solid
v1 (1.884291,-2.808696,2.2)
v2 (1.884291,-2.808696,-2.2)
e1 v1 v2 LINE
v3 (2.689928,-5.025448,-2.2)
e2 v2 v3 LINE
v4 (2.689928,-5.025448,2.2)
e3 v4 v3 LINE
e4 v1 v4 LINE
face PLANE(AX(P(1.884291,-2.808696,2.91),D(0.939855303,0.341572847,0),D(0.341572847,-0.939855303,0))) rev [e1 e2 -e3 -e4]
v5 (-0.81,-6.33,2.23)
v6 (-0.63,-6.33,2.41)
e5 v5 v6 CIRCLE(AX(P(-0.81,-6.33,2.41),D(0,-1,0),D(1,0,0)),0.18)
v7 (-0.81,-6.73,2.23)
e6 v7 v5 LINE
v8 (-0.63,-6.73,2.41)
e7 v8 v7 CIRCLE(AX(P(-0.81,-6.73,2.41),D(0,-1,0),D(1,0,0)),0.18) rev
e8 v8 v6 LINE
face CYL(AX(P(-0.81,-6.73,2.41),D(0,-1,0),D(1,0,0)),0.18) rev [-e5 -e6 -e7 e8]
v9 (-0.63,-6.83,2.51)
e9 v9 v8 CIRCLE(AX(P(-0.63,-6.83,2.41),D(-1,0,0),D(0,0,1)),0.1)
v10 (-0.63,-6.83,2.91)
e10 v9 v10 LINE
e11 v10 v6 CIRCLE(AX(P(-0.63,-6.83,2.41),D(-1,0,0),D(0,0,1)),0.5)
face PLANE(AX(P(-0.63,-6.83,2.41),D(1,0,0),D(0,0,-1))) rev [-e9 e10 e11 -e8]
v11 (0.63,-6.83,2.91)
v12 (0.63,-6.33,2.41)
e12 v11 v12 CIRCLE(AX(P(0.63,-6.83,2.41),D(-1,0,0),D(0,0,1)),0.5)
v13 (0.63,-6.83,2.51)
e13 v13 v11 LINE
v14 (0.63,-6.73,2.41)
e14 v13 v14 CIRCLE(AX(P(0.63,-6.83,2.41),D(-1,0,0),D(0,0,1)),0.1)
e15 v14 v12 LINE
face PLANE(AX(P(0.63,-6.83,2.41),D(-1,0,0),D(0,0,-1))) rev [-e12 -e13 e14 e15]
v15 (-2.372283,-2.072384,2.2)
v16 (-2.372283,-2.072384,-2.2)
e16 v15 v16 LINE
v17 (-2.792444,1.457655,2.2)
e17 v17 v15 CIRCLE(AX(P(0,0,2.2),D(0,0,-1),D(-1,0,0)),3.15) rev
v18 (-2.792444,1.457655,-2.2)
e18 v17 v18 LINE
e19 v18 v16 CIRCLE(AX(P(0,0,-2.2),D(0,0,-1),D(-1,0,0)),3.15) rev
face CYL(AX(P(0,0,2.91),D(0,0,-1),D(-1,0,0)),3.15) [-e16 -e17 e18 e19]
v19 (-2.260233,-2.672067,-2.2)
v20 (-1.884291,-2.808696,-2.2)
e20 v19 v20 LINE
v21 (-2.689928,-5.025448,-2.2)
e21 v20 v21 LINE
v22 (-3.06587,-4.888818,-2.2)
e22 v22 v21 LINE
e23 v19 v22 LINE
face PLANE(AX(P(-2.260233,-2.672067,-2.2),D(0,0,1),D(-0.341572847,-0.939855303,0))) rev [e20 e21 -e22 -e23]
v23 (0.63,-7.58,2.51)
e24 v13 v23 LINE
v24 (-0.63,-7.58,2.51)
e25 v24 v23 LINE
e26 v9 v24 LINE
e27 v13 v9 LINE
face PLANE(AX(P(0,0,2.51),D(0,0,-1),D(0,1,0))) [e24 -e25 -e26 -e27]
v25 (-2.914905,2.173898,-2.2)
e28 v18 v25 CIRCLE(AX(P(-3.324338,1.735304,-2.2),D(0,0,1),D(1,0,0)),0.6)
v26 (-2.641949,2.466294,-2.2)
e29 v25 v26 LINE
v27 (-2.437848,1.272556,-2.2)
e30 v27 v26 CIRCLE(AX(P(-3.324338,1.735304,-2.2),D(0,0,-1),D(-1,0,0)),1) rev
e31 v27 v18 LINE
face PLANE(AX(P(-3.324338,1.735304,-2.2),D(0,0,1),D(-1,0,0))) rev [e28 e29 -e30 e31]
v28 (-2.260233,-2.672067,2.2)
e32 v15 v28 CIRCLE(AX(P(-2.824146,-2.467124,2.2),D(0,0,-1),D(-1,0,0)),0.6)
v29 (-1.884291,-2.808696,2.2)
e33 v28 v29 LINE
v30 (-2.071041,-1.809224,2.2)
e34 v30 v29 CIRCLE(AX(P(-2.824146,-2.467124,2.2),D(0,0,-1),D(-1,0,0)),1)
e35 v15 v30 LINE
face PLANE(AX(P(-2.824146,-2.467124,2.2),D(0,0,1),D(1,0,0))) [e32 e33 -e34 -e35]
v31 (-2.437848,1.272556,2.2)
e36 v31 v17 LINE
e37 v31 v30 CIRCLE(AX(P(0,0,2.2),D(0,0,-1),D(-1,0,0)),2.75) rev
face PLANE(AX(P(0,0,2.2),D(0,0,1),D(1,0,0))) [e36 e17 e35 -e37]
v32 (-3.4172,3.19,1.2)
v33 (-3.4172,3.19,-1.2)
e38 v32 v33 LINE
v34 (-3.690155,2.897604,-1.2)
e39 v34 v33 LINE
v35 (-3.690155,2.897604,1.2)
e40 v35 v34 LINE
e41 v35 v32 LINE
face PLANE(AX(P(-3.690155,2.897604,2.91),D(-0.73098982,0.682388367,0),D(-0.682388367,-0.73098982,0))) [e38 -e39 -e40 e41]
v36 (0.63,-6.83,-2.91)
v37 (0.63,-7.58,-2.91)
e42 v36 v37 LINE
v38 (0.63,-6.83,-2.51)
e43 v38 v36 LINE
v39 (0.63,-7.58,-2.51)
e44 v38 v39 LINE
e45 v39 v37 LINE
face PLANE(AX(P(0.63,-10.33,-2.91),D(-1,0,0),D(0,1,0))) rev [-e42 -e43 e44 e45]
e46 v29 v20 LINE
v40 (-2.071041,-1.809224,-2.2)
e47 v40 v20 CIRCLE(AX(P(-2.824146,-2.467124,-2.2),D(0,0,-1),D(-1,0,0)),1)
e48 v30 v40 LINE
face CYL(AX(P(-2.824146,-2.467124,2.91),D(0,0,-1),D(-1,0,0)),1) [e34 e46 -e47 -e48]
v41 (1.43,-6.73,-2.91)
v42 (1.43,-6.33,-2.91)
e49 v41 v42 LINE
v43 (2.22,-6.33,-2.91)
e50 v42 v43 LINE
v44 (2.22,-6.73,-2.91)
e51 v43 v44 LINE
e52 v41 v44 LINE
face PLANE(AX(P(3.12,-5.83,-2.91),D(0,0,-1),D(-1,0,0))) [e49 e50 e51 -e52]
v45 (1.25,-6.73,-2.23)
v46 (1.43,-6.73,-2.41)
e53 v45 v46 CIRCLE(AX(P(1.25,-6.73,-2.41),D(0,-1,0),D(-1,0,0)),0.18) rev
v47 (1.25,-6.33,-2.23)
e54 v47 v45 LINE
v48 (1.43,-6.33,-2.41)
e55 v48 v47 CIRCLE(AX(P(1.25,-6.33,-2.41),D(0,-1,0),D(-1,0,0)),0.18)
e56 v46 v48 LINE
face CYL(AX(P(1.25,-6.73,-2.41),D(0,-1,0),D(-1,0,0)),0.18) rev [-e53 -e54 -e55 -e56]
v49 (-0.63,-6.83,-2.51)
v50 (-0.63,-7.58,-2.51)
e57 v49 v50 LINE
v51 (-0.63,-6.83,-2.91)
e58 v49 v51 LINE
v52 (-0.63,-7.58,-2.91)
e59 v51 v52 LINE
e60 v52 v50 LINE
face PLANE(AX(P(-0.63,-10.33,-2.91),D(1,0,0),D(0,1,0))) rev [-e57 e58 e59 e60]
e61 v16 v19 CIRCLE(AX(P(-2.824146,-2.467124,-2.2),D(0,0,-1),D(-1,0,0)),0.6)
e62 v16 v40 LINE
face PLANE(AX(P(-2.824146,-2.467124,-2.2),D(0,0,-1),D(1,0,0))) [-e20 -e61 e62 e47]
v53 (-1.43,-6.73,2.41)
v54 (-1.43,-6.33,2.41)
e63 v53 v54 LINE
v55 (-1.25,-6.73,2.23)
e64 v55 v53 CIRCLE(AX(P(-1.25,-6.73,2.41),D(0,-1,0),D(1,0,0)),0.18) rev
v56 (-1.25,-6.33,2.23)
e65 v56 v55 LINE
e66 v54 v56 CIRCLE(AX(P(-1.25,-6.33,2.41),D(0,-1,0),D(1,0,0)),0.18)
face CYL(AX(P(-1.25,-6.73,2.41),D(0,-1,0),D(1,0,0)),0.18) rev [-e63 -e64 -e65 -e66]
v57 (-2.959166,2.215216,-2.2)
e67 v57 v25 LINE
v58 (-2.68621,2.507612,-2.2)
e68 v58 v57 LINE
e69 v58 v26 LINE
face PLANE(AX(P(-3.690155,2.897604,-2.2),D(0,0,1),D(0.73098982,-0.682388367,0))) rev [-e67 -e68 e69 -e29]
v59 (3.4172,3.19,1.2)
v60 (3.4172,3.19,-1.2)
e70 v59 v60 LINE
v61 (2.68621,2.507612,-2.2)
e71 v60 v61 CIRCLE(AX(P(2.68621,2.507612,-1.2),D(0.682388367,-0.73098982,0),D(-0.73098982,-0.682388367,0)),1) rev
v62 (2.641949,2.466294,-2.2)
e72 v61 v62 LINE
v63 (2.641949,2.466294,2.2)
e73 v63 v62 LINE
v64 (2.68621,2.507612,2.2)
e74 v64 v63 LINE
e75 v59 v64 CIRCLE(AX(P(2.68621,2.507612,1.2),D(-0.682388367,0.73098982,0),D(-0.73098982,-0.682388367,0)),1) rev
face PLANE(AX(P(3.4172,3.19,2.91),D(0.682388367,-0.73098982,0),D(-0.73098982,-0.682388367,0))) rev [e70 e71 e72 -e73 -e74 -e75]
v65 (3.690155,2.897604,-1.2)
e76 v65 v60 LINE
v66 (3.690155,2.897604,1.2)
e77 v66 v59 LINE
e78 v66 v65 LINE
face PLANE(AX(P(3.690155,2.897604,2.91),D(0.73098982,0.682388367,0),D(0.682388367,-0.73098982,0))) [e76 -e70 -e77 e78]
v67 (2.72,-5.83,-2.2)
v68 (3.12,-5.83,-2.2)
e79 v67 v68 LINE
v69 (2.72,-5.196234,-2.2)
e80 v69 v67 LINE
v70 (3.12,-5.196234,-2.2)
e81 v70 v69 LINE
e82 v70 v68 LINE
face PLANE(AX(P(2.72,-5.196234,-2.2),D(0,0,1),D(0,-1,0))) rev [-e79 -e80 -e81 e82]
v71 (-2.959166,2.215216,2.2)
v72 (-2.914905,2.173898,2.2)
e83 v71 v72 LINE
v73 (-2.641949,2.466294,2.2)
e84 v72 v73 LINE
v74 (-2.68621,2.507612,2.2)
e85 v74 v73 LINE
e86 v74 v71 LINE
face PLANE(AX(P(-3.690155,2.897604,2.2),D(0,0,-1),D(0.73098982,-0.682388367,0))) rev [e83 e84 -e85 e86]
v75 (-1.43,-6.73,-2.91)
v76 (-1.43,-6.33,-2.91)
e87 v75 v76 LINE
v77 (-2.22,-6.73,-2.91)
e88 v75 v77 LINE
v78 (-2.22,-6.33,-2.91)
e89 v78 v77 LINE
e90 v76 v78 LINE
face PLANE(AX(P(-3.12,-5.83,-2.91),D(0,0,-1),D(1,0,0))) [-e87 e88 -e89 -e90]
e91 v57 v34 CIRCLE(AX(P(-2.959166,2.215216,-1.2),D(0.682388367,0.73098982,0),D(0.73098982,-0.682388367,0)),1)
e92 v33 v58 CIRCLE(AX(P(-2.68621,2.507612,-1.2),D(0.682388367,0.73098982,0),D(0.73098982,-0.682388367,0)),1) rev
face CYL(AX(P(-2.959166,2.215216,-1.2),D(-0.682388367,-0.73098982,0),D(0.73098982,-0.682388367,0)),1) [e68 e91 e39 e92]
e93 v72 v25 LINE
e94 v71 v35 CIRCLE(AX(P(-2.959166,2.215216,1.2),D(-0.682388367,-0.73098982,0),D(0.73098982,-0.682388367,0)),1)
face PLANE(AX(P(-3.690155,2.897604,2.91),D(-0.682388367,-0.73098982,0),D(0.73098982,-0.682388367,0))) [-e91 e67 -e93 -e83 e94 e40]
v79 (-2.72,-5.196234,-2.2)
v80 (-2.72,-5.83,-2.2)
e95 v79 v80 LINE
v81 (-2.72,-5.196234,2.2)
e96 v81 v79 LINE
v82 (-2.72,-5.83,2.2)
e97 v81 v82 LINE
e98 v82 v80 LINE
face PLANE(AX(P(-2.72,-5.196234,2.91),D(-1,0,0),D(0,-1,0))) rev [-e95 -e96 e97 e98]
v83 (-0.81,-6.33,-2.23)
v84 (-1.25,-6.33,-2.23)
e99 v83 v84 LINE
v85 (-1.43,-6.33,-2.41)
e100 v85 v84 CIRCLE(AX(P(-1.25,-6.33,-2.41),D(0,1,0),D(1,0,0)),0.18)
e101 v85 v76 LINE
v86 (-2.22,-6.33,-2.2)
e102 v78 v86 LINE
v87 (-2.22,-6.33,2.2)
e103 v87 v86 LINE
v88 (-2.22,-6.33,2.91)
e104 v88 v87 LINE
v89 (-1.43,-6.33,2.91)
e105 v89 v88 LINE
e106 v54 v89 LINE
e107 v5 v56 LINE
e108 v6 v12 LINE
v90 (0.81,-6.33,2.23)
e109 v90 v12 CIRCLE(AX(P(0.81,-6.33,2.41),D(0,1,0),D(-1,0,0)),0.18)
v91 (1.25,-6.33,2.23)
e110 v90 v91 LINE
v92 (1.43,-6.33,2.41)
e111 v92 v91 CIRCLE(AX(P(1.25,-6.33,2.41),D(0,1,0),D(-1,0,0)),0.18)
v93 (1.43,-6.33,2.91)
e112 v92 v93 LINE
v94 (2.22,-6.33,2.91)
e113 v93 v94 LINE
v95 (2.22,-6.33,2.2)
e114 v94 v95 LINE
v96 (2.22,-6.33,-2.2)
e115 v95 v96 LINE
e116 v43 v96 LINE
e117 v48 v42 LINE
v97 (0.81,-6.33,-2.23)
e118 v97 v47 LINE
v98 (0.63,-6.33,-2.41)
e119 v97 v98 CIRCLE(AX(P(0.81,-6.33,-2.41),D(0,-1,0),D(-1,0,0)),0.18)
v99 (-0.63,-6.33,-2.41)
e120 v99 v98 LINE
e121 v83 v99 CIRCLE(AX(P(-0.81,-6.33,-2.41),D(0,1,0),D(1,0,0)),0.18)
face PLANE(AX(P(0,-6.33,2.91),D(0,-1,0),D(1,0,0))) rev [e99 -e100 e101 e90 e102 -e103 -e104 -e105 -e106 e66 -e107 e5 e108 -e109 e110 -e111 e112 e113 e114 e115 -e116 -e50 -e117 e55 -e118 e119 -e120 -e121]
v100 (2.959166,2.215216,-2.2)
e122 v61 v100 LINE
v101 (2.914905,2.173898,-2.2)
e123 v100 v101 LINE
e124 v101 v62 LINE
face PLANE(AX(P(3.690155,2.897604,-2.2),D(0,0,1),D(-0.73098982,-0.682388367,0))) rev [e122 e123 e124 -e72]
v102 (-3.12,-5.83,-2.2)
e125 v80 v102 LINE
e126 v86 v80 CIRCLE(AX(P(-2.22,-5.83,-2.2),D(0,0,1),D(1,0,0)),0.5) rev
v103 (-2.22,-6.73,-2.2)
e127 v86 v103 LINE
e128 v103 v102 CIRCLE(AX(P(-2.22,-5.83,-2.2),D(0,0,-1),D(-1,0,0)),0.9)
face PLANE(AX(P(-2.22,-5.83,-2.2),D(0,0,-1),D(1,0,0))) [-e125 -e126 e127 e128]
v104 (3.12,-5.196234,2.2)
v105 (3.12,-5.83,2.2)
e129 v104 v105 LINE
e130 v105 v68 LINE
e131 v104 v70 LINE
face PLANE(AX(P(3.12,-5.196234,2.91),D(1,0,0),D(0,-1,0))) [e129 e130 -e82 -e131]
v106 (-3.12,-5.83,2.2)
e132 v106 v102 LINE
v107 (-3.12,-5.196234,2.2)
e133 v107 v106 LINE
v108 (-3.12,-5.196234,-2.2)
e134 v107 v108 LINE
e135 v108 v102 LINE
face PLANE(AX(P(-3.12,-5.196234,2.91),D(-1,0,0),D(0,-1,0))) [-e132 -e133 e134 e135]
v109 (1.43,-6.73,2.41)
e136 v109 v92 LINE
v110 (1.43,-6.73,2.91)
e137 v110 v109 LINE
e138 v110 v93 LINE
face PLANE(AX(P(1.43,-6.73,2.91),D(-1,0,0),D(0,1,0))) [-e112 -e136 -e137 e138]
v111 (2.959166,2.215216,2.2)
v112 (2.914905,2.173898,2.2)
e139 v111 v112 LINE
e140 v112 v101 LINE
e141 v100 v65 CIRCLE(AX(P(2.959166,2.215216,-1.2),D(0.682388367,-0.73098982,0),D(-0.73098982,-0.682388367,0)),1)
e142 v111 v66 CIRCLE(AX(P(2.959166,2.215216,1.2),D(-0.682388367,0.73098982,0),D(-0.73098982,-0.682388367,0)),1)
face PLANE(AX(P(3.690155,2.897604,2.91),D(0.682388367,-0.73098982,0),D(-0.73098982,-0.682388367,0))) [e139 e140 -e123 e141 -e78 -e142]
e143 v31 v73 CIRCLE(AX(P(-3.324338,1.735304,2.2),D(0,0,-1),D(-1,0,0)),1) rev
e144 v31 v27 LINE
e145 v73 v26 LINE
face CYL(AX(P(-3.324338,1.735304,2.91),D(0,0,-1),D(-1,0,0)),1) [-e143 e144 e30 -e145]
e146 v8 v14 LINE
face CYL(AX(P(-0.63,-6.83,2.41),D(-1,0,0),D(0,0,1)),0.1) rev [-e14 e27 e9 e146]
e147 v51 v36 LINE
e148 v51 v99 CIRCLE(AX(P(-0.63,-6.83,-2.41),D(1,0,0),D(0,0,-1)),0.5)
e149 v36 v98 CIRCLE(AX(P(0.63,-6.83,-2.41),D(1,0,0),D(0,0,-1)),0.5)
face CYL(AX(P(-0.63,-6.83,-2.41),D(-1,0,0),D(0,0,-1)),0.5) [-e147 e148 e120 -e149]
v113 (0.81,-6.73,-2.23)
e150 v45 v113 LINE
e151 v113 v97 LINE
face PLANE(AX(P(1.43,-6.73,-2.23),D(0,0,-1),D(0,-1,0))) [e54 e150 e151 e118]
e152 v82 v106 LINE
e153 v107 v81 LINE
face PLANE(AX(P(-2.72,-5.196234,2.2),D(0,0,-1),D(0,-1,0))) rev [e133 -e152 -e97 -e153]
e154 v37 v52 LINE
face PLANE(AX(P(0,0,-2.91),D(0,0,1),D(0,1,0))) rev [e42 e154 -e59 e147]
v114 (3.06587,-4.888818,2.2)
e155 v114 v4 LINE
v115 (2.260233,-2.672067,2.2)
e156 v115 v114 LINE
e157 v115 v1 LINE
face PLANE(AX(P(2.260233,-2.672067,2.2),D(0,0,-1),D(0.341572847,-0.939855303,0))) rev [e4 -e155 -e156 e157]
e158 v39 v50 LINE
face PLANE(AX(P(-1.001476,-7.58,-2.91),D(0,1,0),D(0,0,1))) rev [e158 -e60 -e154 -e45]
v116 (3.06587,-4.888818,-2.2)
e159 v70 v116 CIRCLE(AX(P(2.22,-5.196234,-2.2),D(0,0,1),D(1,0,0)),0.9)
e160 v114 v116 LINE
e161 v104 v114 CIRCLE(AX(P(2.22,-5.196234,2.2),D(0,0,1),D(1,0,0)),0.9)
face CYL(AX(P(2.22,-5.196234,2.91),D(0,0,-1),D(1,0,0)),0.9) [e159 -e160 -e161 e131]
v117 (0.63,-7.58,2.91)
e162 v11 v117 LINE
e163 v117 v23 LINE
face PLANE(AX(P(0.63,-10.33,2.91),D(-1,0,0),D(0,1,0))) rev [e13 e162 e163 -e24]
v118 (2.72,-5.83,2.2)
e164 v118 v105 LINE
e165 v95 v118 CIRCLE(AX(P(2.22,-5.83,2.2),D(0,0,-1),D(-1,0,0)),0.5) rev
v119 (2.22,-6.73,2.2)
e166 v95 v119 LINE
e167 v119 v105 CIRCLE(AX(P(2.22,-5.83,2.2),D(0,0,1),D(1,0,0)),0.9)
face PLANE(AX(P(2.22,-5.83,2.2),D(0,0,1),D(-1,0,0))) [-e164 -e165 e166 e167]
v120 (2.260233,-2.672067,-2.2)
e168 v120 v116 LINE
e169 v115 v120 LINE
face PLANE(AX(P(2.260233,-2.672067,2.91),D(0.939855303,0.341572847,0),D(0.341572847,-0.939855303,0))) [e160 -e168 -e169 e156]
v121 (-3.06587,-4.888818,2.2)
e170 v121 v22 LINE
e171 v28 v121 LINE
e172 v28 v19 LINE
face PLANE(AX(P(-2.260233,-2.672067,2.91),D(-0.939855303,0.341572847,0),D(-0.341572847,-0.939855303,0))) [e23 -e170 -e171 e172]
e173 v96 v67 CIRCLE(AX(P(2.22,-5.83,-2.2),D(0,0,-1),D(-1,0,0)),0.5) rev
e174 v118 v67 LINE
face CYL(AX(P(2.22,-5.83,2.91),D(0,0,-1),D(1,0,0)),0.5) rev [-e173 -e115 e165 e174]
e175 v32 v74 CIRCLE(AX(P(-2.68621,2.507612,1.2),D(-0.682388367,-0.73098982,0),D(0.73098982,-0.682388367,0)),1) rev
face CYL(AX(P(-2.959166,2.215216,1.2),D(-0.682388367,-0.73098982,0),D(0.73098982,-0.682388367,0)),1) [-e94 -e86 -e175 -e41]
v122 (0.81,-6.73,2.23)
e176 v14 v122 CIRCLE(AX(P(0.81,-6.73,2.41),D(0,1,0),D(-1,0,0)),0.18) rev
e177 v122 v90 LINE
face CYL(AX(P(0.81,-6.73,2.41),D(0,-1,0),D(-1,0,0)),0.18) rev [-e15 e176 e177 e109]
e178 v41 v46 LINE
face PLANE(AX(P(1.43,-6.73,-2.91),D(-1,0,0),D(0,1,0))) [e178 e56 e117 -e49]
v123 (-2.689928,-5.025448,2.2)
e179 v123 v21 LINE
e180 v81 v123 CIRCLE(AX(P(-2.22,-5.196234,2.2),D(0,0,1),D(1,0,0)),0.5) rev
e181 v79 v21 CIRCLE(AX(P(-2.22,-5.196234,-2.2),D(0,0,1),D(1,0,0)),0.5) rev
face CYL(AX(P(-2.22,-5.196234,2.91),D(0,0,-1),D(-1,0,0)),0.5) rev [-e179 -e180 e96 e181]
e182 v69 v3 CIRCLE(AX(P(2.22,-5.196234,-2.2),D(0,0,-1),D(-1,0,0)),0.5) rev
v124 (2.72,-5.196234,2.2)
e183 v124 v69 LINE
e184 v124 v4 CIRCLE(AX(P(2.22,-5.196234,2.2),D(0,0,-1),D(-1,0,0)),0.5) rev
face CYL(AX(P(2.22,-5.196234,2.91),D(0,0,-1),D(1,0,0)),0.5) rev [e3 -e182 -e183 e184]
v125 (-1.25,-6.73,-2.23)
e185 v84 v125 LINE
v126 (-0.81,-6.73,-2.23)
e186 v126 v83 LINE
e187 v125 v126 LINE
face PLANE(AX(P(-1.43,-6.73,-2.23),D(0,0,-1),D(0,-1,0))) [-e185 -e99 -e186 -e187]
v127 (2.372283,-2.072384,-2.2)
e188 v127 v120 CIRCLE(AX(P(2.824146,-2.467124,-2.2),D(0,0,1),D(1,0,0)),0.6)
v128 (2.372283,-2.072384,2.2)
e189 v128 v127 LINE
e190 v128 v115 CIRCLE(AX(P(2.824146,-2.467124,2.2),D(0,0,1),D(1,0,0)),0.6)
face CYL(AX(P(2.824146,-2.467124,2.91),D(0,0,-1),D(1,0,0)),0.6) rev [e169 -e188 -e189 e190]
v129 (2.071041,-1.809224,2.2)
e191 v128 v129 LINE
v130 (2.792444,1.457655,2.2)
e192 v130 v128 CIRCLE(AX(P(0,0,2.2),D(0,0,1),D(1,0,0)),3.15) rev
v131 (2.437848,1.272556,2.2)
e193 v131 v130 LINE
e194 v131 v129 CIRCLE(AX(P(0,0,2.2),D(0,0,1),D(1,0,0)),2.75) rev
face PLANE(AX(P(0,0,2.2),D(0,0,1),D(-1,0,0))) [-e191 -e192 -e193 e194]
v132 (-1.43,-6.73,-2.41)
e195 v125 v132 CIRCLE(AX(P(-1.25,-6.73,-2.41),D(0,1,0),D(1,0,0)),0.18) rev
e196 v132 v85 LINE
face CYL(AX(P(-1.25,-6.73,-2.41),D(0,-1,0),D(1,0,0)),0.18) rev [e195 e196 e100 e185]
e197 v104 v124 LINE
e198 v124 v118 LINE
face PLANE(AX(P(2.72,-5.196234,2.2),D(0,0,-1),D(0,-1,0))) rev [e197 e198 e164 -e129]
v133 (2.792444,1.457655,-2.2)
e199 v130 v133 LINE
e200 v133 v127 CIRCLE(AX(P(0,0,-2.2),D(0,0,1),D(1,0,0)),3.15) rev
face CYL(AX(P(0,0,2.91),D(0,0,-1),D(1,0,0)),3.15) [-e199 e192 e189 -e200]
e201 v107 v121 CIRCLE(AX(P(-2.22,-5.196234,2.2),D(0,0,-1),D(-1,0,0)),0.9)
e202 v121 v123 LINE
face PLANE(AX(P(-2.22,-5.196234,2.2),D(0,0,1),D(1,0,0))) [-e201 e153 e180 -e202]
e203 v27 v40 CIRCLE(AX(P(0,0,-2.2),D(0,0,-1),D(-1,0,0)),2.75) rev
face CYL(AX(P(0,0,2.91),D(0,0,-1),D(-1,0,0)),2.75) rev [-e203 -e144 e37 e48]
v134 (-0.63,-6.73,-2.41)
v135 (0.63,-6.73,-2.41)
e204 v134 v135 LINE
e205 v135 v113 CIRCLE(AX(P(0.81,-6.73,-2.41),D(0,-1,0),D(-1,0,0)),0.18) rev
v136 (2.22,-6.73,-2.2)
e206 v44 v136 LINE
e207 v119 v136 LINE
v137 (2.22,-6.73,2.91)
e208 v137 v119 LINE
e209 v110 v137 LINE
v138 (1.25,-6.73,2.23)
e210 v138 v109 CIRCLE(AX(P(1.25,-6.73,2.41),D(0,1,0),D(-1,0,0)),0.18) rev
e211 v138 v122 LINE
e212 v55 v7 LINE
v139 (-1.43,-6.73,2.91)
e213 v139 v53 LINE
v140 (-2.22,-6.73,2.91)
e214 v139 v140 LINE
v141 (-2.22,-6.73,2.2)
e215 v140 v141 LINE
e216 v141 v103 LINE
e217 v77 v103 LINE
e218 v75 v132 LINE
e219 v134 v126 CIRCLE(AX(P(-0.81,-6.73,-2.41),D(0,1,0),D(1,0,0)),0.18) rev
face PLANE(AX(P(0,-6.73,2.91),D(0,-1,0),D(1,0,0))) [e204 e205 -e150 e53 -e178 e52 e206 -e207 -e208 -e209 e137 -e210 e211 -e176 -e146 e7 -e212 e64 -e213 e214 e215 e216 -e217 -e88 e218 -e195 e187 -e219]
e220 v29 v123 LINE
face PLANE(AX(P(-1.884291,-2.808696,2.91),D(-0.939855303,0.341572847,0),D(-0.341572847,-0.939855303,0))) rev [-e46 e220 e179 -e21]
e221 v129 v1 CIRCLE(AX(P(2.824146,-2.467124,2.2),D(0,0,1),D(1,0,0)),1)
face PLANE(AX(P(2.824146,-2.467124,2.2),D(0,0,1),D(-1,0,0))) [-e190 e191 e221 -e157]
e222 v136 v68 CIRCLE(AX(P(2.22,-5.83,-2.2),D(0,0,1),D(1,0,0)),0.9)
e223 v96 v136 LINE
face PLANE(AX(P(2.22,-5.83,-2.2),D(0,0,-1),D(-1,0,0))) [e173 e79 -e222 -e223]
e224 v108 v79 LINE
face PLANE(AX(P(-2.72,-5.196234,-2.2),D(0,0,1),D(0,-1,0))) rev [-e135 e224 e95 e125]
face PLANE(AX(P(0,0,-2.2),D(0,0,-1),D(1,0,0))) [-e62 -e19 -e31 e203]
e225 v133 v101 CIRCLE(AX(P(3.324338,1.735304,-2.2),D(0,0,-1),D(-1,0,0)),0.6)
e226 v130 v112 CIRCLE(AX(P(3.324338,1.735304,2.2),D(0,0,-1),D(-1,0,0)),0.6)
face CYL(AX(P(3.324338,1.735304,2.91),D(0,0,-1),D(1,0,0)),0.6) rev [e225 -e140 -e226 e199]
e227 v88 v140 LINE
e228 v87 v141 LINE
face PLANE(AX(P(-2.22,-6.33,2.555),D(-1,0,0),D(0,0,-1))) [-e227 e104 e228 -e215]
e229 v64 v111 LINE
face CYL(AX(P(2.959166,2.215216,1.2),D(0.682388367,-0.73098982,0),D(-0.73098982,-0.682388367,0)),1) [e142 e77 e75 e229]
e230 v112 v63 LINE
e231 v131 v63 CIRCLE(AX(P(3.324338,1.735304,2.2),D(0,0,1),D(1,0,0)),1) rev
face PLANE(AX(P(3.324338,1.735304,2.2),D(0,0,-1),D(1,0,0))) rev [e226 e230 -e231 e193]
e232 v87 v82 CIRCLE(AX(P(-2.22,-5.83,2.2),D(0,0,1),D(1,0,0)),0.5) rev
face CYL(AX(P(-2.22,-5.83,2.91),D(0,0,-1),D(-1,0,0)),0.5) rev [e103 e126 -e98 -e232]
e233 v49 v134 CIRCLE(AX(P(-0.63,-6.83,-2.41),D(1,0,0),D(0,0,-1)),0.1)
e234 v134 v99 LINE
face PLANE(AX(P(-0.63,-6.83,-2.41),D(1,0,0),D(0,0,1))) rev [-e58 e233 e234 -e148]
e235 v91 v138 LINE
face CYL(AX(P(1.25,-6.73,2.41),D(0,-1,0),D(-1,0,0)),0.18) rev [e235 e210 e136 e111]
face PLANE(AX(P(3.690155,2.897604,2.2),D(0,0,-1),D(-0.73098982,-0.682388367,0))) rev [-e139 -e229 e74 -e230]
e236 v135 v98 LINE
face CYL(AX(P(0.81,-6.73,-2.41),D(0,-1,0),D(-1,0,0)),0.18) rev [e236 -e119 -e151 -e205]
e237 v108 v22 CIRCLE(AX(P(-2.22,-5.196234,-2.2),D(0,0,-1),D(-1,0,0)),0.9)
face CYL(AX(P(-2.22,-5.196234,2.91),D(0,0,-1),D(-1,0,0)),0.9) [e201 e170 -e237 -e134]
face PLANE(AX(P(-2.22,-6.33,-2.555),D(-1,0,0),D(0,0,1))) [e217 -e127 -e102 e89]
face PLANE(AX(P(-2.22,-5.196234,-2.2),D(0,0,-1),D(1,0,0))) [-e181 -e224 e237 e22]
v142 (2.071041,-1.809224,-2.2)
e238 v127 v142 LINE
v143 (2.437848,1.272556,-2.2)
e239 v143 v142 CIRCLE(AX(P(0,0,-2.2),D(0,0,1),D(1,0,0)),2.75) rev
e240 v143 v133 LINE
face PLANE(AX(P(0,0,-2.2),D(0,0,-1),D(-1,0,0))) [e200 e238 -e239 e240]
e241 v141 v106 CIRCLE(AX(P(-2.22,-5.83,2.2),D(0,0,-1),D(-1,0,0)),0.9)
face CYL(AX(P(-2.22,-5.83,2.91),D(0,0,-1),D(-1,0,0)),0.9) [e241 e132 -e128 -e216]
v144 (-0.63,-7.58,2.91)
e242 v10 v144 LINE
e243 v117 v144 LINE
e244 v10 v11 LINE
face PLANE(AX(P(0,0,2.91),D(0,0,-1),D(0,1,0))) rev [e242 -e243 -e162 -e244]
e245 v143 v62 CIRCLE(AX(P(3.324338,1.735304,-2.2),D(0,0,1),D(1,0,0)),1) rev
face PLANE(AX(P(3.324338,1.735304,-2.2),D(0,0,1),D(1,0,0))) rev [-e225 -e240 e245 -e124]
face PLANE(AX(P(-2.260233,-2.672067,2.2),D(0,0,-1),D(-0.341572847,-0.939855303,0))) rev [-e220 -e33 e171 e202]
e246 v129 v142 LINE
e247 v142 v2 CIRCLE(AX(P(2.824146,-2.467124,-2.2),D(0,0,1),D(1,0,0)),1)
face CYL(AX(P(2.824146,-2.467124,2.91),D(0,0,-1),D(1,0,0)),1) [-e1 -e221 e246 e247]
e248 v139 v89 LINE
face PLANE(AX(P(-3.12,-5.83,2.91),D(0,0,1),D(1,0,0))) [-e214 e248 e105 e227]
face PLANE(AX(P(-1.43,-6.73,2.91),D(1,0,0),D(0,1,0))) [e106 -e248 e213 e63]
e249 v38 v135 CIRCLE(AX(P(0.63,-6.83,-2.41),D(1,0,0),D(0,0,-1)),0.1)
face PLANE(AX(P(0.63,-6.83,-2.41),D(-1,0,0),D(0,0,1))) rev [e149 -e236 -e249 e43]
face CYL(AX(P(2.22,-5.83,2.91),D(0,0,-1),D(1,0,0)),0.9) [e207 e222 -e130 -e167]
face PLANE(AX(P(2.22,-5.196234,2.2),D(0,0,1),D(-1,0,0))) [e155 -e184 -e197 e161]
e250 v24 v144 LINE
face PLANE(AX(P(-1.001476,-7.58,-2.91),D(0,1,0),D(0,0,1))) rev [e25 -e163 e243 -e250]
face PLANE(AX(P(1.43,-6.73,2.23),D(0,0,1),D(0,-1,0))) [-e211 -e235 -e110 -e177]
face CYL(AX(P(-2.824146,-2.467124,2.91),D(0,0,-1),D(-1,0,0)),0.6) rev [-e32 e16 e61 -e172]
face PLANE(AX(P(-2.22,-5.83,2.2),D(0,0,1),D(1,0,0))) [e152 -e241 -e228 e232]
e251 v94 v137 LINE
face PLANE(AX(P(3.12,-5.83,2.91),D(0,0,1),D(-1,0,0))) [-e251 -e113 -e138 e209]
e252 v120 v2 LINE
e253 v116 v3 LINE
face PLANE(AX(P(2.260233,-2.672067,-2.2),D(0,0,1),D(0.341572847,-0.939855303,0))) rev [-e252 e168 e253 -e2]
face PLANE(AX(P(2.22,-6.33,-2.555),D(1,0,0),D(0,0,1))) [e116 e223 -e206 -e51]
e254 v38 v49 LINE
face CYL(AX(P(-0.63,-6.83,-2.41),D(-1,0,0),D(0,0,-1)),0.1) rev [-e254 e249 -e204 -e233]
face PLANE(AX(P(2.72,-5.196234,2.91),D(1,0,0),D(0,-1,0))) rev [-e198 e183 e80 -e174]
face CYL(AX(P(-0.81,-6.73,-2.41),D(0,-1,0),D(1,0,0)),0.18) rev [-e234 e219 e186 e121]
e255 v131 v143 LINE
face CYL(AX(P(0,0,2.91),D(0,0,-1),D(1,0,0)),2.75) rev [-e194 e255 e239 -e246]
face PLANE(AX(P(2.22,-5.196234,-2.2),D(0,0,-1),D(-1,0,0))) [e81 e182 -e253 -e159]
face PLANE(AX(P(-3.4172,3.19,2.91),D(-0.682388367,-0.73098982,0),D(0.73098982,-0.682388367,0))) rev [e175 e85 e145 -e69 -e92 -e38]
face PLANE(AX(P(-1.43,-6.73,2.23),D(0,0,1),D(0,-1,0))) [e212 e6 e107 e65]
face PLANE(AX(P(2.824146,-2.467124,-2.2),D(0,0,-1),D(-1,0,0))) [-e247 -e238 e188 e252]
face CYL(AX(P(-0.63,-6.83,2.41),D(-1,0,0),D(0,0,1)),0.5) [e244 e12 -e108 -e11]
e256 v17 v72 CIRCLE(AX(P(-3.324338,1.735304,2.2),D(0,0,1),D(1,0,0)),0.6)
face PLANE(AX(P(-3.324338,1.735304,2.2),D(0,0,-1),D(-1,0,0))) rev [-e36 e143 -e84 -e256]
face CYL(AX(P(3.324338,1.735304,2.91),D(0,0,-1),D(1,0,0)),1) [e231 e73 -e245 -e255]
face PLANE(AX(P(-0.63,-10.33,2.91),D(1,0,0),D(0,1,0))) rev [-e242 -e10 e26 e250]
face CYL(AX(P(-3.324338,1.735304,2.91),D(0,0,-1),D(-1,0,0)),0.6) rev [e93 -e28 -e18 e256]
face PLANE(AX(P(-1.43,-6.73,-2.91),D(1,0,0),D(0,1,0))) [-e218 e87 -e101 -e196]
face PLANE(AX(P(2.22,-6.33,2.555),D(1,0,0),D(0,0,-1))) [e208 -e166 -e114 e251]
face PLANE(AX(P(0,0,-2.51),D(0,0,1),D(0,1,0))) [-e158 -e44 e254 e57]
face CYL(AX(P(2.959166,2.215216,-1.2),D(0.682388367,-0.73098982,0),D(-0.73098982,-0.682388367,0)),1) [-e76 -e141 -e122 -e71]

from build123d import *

# Parameters (mm, degrees)
SM_BASE_FLANGE_1_DEPTH            = 2.91
CUT_EXTRUDE_START                 = -9.92
CUT_EXTRUDE_2_OUTLINE_W           = 5
CUT_EXTRUDE_2_OUTLINE_H           = 0.71
CUT_EXTRUDE_2_DEPTH               = 9.52
CUT_EXTRUDE_START_2               = -0.4
CUT_EXTRUDE_2_2_OUTLINE_W         = 0.9
CUT_EXTRUDE_2_2_OUTLINE_H         = 0.71
CUT_EXTRUDE_2_2_DEPTH             = 0.4
SM_EDGE_FLANGE_2_STRIP_W          = 1.8
SM_EDGE_FLANGE_2_STRIP_H          = 0.4
SM_EDGE_FLANGE_2_STRIP_CUT_DEPTH  = 0.63
SM_EDGE_FLANGE_2_RELIEF_W         = 1.98
SM_EDGE_FLANGE_2_RELIEF_H         = 0.8
SM_EDGE_FLANGE_2_RELIEF_CUT_DEPTH = 0.4
SM_EDGE_FLANGE_2_DEPTH            = 0.63
FILLET_3_R                        = 0.18
CUT_EXTRUDE_4_DEPTH               = 12.348755283
FILLET_4_R                        = 1
SKETCH_33_W                       = 2.00295296
SKETCH_33_H                       = 3.384867517
CUT_EXTRUDE_5_DEPTH               = 13.417670735


# Read off the part's stored shape, not the designer's step: 切除-拉伸2
# Sheet-metal steps are written as plain solids
with BuildPart() as part:
    # Sketch 1 → 基体-法兰1 (new body)
    with BuildSketch(Plane.XY):
        with BuildLine():
            Line((-3.4172, 3.19), (-2.64194931, 2.466293544))
            ThreePointArc((-2.64194931, 2.466293544), (-2.338641394, 1.90383514), (-2.437847629, 1.272556064))
            ThreePointArc((-2.437847629, 1.272556064), (-2.730725187, -0.325023008), (-2.071040526, -1.809223905))
            ThreePointArc((-2.071040526, -1.809223905), (-1.841158131, -2.283453933), (-1.884290869, -2.808696355))
            Line((-1.884290869, -2.808696355), (-2.689927651, -5.025447504))
            ThreePointArc((-2.689927651, -5.025447504), (-2.712424525, -5.109527023), (-2.72, -5.196233927))
            Line((-2.72, -5.196233927), (-2.72, -5.83))
            ThreePointArc((-2.72, -5.83), (-2.573553391, -6.183553391), (-2.22, -6.33))
            Line((-2.22, -6.33), (0, -6.33))
            Line((0, -6.33), (0, -6.73))
            Line((0, -6.73), (-2.22, -6.73))
            ThreePointArc((-2.22, -6.73), (-2.856396103, -6.466396103), (-3.12, -5.83))
            Line((-3.12, -5.83), (-3.12, -5.196233927))
            ThreePointArc((-3.12, -5.196233927), (-3.106364145, -5.0401615), (-3.065869772, -4.888818365))
            Line((-3.065869772, -4.888818365), (-2.26023299, -2.672067216))
            ThreePointArc((-2.26023299, -2.672067216), (-2.234353348, -2.356921763), (-2.372282784, -2.072383746))
            ThreePointArc((-2.372282784, -2.072383746), (-3.127921577, -0.372299082), (-2.792443648, 1.457655128))
            ThreePointArc((-2.792443648, 1.457655128), (-2.732919907, 1.836422573), (-2.914904656, 2.173897616))
            Line((-2.914904656, 2.173897616), (-3.690155347, 2.897604072))
            Line((-3.690155347, 2.897604072), (-3.4172, 3.19))
        make_face()
    extrude(amount=SM_BASE_FLANGE_1_DEPTH)

    # 切除-拉伸2 outline → 切除-拉伸2 (cut)
    with BuildSketch(Plane.XZ.offset(6.73).offset(CUT_EXTRUDE_START)):
        with Locations((-2.5, 2.555)):
            Rectangle(CUT_EXTRUDE_2_OUTLINE_W, CUT_EXTRUDE_2_OUTLINE_H)
    extrude(amount=CUT_EXTRUDE_2_DEPTH, mode=Mode.SUBTRACT)

    # Cut-Extrude 2 2 outline → Cut-Extrude 2 2 (cut)
    with BuildSketch(Plane.XZ.offset(6.73).offset(CUT_EXTRUDE_START_2)):
        with Locations((-2.67, 2.555)):
            Rectangle(CUT_EXTRUDE_2_2_OUTLINE_W, CUT_EXTRUDE_2_2_OUTLINE_H)
    extrude(amount=CUT_EXTRUDE_2_2_DEPTH, mode=Mode.SUBTRACT)

    # 边线-法兰2 strip (across the edge) → 边线-法兰2 strip cut (cut)
    with BuildSketch(Plane(origin=(0, -6.73, 2.91), x_dir=(0, 0, -1), z_dir=(-1, 0, 0))):
        with Locations((-0.4, -0.2)):
            Rectangle(SM_EDGE_FLANGE_2_STRIP_W, SM_EDGE_FLANGE_2_STRIP_H)
    extrude(amount=SM_EDGE_FLANGE_2_STRIP_CUT_DEPTH, mode=Mode.SUBTRACT)

    # 边线-法兰2 relief (on the sheet) → 边线-法兰2 relief cut (cut)
    with BuildSketch(Plane(origin=(0, -6.73, 2.41), x_dir=(0, 0, -1), z_dir=(0, -1, 0))):
        with Locations((-0.81, -1.03)):
            Rectangle(SM_EDGE_FLANGE_2_RELIEF_W, SM_EDGE_FLANGE_2_RELIEF_H)
    extrude(amount=-SM_EDGE_FLANGE_2_RELIEF_CUT_DEPTH, mode=Mode.SUBTRACT)

    # 边线-法兰2 section (across the edge) → 边线-法兰2 (add)
    with BuildSketch(Plane(origin=(0, -6.73, 2.91), x_dir=(0, 0, -1), z_dir=(-1, 0, 0))):
        with BuildLine():
            Line((0, 0.1), (0, 3.6))
            Line((0, 3.6), (0.4, 3.6))
            Line((0.4, 3.6), (0.4, 0.1))
            ThreePointArc((0.4, 0.1), (0.429289322, 0.029289322), (0.5, 0))
            Line((0.5, 0), (0.5, -0.4))
            ThreePointArc((0.5, -0.4), (0.146446609, -0.253553391), (0, 0.1))
        make_face()
    extrude(amount=SM_EDGE_FLANGE_2_DEPTH)

    # 圆角3
    fillet_3_edges = [part.edges().sort_by_distance(p)[0] for p in [
        (-1.43, -6.53, 2.23),
        (-0.63, -6.53, 2.23),
    ]]
    fillet(fillet_3_edges, radius=FILLET_3_R)

    # 草图29 → 切除-拉伸4 (cut, through all)
    with BuildSketch(Plane.XY.offset(2.91)):
        with BuildLine():
            Line((-0.63, -8.93), (-1.33273135, -8.93))
            Line((-1.33273135, -8.93), (-1.33273135, -10.562100009))
            Line((-1.33273135, -10.562100009), (0, -10.562100009))
            Line((0, -10.562100009), (0, -10.33))
            ThreePointArc((0, -10.33), (-0.465244282, -9.697609927), (-0.63, -8.93))
        make_face()
    extrude(amount=-CUT_EXTRUDE_4_DEPTH, mode=Mode.SUBTRACT)

    # 圆角4
    fillet_4_edges = [part.edges().sort_by_distance(p)[0] for p in [
        (-3.553677673, 3.043802036, 2.2),
    ]]
    fillet(fillet_4_edges, radius=FILLET_4_R)

    # 镜向8: part across plane


with BuildPart() as part_1:
    add(part.part)
    add(part.part.mirror(Plane(origin=(0, -6.33, 2.91), x_dir=(0, 0, 1), z_dir=(1, 0, 0))))

    # 镜向9: part across plane


with BuildPart() as part_2:
    add(part_1.part)
    add(part_1.part.mirror(Plane(origin=(-2.26023299, -2.672067216, 0), x_dir=(1, 0, 0), z_dir=(0, 0, -1))))

    # 草图33 → 切除-拉伸5 (cut, through all)
    with BuildSketch(Plane.XY.offset(2.91)):
        with Locations((0, -9.272433759)):
            Rectangle(SKETCH_33_W, SKETCH_33_H)
    extrude(amount=-CUT_EXTRUDE_5_DEPTH, mode=Mode.SUBTRACT)


solid = part_2.part
